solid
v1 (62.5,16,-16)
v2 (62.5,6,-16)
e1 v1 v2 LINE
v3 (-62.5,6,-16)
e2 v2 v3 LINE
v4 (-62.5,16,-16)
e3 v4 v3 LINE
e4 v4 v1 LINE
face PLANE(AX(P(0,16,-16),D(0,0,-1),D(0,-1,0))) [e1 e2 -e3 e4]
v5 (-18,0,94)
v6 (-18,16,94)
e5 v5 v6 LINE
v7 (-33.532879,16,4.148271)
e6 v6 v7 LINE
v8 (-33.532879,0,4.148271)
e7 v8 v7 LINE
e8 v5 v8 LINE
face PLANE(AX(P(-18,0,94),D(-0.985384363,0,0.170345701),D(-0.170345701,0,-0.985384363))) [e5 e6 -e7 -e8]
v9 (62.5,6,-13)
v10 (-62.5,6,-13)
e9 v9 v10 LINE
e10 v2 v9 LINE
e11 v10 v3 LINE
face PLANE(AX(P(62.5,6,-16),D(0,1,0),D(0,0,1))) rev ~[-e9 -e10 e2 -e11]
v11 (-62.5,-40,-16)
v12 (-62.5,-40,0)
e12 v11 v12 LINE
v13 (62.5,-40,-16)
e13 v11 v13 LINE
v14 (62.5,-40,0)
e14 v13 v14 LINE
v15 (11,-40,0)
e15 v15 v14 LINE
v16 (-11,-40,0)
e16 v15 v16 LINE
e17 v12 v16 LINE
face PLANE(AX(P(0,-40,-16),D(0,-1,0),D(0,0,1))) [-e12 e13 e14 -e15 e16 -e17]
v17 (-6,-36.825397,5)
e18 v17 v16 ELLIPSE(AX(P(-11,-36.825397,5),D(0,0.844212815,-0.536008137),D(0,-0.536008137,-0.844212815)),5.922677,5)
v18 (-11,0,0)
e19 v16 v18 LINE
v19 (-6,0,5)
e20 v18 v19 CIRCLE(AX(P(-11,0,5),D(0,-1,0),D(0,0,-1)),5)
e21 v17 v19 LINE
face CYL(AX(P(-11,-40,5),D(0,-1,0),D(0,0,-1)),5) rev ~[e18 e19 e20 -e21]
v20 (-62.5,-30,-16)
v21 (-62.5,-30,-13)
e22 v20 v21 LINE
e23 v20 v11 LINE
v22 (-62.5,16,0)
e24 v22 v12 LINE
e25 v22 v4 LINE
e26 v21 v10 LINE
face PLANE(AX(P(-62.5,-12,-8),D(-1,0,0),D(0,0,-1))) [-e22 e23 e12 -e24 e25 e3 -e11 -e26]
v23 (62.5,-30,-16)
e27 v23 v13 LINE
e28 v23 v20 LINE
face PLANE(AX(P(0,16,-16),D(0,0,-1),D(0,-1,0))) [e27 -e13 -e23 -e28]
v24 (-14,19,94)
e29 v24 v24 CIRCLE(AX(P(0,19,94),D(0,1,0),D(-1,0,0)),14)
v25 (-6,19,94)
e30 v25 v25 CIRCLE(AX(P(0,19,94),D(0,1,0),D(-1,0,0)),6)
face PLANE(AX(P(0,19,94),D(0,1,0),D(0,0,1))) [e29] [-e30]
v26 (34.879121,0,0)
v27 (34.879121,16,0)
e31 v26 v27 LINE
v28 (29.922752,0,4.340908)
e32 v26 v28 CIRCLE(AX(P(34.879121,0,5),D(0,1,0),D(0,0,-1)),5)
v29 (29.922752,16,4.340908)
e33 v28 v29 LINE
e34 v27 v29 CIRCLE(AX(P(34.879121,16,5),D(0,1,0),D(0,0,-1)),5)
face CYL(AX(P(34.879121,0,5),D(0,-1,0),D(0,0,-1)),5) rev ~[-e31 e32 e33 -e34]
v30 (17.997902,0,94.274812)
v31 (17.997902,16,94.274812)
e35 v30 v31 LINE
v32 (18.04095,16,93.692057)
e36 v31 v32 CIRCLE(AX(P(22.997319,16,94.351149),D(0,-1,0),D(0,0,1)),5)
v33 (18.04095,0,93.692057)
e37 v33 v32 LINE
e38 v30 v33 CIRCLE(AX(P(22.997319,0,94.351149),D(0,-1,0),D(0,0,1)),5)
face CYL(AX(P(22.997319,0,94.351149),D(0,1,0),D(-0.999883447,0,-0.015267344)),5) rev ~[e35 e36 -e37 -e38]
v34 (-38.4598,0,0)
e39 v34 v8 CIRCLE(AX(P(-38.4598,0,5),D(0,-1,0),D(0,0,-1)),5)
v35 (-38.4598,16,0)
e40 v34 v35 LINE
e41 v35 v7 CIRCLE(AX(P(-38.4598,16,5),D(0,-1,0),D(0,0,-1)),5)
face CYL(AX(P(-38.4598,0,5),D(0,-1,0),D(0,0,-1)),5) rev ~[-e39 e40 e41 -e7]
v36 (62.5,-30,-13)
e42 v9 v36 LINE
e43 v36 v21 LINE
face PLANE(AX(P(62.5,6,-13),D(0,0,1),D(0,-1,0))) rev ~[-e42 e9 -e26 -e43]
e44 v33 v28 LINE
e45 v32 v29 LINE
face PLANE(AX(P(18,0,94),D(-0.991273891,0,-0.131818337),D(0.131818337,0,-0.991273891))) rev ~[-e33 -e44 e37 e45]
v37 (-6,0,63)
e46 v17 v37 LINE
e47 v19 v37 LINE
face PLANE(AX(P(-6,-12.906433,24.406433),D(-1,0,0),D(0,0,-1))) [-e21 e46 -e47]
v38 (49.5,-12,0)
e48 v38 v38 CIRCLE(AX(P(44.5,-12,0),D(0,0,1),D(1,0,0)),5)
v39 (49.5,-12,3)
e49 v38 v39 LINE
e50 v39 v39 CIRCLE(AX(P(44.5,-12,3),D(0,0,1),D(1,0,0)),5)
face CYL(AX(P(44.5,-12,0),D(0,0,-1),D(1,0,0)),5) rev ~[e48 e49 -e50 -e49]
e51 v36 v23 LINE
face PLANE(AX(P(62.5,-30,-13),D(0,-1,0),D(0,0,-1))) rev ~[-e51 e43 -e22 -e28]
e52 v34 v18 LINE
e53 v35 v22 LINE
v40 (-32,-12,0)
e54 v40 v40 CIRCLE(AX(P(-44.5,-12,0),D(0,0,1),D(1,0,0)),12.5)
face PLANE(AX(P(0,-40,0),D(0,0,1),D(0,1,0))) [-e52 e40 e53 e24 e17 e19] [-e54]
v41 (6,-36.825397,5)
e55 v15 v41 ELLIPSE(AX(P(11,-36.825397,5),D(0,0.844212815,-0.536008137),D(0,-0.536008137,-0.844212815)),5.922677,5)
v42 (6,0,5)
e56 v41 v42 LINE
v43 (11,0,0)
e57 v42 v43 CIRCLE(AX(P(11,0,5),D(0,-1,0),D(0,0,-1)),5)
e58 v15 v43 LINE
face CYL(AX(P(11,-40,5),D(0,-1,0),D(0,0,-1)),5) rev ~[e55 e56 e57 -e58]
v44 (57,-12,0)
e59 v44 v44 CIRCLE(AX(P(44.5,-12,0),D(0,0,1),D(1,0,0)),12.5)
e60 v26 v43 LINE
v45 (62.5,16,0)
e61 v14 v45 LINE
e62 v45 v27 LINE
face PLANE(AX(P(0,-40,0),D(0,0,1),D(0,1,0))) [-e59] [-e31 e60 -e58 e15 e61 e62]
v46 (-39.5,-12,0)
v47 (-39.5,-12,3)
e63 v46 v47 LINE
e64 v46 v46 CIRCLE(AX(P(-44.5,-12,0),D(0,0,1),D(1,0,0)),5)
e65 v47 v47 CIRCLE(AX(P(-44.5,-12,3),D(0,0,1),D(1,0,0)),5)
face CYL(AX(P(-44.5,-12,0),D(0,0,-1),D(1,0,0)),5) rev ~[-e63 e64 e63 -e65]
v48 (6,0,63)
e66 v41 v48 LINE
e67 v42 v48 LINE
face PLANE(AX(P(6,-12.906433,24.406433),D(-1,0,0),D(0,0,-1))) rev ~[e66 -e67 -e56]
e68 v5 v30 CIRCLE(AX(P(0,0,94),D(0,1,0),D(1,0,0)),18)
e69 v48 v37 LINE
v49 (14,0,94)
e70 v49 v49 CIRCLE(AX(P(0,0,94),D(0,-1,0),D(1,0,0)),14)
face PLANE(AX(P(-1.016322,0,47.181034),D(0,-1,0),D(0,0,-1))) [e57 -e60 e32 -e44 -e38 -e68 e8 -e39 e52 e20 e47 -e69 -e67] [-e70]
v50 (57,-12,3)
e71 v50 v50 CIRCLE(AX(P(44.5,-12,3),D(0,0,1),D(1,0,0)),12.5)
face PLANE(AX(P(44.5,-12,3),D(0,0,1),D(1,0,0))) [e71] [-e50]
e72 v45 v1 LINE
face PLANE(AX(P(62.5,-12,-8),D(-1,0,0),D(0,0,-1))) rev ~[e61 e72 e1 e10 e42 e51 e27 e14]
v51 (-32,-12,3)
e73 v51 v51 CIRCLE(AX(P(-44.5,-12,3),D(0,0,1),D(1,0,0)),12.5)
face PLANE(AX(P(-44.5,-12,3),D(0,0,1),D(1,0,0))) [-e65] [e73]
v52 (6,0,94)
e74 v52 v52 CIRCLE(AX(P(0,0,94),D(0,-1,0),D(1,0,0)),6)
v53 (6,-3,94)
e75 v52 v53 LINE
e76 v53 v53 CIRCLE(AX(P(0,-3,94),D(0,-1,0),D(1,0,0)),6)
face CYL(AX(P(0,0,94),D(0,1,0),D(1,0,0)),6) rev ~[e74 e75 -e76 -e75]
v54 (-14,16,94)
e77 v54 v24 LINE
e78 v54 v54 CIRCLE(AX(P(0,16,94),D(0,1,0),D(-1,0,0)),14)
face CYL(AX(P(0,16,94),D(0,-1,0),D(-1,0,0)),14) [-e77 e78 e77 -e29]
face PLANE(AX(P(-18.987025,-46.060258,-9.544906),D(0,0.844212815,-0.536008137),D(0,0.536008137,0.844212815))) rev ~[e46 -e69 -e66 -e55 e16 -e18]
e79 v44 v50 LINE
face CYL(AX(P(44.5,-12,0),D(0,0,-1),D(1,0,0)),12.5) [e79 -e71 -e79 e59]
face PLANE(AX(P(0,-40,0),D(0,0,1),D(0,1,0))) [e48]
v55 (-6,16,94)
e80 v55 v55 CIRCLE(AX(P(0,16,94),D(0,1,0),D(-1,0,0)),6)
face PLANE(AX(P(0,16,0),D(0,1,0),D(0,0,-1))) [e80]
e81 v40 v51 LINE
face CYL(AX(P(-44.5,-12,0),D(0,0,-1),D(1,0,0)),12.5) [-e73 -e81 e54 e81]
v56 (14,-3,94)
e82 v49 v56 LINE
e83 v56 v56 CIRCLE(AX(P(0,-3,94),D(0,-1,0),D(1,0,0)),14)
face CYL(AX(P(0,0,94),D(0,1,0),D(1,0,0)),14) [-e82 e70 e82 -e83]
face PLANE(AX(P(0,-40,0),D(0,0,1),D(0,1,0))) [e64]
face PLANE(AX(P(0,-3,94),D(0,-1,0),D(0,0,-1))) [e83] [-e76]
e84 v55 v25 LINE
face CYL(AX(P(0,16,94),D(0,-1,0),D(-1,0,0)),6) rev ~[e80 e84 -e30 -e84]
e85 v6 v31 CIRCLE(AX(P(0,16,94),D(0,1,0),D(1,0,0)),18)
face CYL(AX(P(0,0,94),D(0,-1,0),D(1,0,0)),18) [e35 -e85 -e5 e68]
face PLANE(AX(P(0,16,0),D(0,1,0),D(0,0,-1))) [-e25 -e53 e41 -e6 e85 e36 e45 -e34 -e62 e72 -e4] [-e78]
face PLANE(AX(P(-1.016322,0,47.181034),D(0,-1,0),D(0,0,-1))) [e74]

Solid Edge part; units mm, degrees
sketch "Sketch1" plane through (0, 0, 0) normal (1, 0, 0) x (0, 1, 0)
  line L0 (-40, 0) -> (0, 63)
  line L1 (0, 0) -> (0, 63)
  line L2 (-40, 0) -> (0, 0)
extrude "Protrusion1" add sketch "Sketch1" along normal mid plane 12
sketch "Sketch2" plane through (0, 0, 0) normal (1, 0, 0) x (0, 1, 0)
  line L0 (-40, 0) -> (0, 0)
  line L1 (16, 0) -> (0, 0)
  line L2 (16, 0) -> (16, -16)
  line L3 (16, -16) -> (-40, -16)
  line L4 (-40, -16) -> (-40, 0)
extrude "Protrusion_2" add sketch "Sketch2" along normal mid plane 125
sketch "Sketch3" plane through (62.5, -12, 48) normal (1, 0, 0) x (0, 1, 0)
  line L0 (18, -64) -> (18, -61)
  line L1 (18, -61) -> (-18, -61)
  line L2 (-18, -61) -> (-18, -64)
  line L3 (-18, -64) -> (18, -64)
extrude "ExtrudedCutout_1" cut sketch "Sketch3" against normal blind 151
sketch "Sketch4" plane through (0, 0, 56) normal (0, -1, 0) x (1, 0, 0)
  line L0 (-18, 38) -> (-34.25, -56)
  line L1 (30.5, -56) -> (-34.25, -56)
  line L2 (18, 38) -> (30.5, -56)
  arc A0 (-18, 38) -> (18, 38) centre (0, 38) cw
extrude "Protrusion_3" add sketch "Sketch4" against normal blind 16
sketch "Sketch5" plane through (-34.25, -12, 0) normal (0, 0, 1) x (1, 0, 0)
  circle A0 centre (78.75, 0) radius 12.5
  circle A1 centre (78.75, 0) radius 5
  circle A2 centre (-10.25, 0) radius 12.5
  circle A3 centre (-10.25, 0) radius 5
extrude "Protrusion2" add sketch "Sketch5" along normal blind 3
sketch "Sketch6" plane through (-1.875, 0, 56) normal (0, -1, 0) x (1, 0, 0)
  circle A0 centre (1.875, 38) radius 6
  circle A1 centre (1.875, 38) radius 14
extrude "Protrusion_5" add sketch "Sketch6" along normal blind 3
sketch "Sketch7" plane through (0, 16, 48) normal (0, 1, 0) x (-1, 0, 0)
  circle A0 centre (0, 46) radius 6
  circle A1 centre (0, 46) radius 14
extrude "Protrusion3" add sketch "Sketch7" along normal blind 3
fillet "Round_1" radius 5 4 edges at (6, -20, 0) (-6, -20, 0) (30.5, 8, 0) (-34.25, 8, 0)
fillet "Round_2" radius 5 1 edges at (18, 8, 94)
